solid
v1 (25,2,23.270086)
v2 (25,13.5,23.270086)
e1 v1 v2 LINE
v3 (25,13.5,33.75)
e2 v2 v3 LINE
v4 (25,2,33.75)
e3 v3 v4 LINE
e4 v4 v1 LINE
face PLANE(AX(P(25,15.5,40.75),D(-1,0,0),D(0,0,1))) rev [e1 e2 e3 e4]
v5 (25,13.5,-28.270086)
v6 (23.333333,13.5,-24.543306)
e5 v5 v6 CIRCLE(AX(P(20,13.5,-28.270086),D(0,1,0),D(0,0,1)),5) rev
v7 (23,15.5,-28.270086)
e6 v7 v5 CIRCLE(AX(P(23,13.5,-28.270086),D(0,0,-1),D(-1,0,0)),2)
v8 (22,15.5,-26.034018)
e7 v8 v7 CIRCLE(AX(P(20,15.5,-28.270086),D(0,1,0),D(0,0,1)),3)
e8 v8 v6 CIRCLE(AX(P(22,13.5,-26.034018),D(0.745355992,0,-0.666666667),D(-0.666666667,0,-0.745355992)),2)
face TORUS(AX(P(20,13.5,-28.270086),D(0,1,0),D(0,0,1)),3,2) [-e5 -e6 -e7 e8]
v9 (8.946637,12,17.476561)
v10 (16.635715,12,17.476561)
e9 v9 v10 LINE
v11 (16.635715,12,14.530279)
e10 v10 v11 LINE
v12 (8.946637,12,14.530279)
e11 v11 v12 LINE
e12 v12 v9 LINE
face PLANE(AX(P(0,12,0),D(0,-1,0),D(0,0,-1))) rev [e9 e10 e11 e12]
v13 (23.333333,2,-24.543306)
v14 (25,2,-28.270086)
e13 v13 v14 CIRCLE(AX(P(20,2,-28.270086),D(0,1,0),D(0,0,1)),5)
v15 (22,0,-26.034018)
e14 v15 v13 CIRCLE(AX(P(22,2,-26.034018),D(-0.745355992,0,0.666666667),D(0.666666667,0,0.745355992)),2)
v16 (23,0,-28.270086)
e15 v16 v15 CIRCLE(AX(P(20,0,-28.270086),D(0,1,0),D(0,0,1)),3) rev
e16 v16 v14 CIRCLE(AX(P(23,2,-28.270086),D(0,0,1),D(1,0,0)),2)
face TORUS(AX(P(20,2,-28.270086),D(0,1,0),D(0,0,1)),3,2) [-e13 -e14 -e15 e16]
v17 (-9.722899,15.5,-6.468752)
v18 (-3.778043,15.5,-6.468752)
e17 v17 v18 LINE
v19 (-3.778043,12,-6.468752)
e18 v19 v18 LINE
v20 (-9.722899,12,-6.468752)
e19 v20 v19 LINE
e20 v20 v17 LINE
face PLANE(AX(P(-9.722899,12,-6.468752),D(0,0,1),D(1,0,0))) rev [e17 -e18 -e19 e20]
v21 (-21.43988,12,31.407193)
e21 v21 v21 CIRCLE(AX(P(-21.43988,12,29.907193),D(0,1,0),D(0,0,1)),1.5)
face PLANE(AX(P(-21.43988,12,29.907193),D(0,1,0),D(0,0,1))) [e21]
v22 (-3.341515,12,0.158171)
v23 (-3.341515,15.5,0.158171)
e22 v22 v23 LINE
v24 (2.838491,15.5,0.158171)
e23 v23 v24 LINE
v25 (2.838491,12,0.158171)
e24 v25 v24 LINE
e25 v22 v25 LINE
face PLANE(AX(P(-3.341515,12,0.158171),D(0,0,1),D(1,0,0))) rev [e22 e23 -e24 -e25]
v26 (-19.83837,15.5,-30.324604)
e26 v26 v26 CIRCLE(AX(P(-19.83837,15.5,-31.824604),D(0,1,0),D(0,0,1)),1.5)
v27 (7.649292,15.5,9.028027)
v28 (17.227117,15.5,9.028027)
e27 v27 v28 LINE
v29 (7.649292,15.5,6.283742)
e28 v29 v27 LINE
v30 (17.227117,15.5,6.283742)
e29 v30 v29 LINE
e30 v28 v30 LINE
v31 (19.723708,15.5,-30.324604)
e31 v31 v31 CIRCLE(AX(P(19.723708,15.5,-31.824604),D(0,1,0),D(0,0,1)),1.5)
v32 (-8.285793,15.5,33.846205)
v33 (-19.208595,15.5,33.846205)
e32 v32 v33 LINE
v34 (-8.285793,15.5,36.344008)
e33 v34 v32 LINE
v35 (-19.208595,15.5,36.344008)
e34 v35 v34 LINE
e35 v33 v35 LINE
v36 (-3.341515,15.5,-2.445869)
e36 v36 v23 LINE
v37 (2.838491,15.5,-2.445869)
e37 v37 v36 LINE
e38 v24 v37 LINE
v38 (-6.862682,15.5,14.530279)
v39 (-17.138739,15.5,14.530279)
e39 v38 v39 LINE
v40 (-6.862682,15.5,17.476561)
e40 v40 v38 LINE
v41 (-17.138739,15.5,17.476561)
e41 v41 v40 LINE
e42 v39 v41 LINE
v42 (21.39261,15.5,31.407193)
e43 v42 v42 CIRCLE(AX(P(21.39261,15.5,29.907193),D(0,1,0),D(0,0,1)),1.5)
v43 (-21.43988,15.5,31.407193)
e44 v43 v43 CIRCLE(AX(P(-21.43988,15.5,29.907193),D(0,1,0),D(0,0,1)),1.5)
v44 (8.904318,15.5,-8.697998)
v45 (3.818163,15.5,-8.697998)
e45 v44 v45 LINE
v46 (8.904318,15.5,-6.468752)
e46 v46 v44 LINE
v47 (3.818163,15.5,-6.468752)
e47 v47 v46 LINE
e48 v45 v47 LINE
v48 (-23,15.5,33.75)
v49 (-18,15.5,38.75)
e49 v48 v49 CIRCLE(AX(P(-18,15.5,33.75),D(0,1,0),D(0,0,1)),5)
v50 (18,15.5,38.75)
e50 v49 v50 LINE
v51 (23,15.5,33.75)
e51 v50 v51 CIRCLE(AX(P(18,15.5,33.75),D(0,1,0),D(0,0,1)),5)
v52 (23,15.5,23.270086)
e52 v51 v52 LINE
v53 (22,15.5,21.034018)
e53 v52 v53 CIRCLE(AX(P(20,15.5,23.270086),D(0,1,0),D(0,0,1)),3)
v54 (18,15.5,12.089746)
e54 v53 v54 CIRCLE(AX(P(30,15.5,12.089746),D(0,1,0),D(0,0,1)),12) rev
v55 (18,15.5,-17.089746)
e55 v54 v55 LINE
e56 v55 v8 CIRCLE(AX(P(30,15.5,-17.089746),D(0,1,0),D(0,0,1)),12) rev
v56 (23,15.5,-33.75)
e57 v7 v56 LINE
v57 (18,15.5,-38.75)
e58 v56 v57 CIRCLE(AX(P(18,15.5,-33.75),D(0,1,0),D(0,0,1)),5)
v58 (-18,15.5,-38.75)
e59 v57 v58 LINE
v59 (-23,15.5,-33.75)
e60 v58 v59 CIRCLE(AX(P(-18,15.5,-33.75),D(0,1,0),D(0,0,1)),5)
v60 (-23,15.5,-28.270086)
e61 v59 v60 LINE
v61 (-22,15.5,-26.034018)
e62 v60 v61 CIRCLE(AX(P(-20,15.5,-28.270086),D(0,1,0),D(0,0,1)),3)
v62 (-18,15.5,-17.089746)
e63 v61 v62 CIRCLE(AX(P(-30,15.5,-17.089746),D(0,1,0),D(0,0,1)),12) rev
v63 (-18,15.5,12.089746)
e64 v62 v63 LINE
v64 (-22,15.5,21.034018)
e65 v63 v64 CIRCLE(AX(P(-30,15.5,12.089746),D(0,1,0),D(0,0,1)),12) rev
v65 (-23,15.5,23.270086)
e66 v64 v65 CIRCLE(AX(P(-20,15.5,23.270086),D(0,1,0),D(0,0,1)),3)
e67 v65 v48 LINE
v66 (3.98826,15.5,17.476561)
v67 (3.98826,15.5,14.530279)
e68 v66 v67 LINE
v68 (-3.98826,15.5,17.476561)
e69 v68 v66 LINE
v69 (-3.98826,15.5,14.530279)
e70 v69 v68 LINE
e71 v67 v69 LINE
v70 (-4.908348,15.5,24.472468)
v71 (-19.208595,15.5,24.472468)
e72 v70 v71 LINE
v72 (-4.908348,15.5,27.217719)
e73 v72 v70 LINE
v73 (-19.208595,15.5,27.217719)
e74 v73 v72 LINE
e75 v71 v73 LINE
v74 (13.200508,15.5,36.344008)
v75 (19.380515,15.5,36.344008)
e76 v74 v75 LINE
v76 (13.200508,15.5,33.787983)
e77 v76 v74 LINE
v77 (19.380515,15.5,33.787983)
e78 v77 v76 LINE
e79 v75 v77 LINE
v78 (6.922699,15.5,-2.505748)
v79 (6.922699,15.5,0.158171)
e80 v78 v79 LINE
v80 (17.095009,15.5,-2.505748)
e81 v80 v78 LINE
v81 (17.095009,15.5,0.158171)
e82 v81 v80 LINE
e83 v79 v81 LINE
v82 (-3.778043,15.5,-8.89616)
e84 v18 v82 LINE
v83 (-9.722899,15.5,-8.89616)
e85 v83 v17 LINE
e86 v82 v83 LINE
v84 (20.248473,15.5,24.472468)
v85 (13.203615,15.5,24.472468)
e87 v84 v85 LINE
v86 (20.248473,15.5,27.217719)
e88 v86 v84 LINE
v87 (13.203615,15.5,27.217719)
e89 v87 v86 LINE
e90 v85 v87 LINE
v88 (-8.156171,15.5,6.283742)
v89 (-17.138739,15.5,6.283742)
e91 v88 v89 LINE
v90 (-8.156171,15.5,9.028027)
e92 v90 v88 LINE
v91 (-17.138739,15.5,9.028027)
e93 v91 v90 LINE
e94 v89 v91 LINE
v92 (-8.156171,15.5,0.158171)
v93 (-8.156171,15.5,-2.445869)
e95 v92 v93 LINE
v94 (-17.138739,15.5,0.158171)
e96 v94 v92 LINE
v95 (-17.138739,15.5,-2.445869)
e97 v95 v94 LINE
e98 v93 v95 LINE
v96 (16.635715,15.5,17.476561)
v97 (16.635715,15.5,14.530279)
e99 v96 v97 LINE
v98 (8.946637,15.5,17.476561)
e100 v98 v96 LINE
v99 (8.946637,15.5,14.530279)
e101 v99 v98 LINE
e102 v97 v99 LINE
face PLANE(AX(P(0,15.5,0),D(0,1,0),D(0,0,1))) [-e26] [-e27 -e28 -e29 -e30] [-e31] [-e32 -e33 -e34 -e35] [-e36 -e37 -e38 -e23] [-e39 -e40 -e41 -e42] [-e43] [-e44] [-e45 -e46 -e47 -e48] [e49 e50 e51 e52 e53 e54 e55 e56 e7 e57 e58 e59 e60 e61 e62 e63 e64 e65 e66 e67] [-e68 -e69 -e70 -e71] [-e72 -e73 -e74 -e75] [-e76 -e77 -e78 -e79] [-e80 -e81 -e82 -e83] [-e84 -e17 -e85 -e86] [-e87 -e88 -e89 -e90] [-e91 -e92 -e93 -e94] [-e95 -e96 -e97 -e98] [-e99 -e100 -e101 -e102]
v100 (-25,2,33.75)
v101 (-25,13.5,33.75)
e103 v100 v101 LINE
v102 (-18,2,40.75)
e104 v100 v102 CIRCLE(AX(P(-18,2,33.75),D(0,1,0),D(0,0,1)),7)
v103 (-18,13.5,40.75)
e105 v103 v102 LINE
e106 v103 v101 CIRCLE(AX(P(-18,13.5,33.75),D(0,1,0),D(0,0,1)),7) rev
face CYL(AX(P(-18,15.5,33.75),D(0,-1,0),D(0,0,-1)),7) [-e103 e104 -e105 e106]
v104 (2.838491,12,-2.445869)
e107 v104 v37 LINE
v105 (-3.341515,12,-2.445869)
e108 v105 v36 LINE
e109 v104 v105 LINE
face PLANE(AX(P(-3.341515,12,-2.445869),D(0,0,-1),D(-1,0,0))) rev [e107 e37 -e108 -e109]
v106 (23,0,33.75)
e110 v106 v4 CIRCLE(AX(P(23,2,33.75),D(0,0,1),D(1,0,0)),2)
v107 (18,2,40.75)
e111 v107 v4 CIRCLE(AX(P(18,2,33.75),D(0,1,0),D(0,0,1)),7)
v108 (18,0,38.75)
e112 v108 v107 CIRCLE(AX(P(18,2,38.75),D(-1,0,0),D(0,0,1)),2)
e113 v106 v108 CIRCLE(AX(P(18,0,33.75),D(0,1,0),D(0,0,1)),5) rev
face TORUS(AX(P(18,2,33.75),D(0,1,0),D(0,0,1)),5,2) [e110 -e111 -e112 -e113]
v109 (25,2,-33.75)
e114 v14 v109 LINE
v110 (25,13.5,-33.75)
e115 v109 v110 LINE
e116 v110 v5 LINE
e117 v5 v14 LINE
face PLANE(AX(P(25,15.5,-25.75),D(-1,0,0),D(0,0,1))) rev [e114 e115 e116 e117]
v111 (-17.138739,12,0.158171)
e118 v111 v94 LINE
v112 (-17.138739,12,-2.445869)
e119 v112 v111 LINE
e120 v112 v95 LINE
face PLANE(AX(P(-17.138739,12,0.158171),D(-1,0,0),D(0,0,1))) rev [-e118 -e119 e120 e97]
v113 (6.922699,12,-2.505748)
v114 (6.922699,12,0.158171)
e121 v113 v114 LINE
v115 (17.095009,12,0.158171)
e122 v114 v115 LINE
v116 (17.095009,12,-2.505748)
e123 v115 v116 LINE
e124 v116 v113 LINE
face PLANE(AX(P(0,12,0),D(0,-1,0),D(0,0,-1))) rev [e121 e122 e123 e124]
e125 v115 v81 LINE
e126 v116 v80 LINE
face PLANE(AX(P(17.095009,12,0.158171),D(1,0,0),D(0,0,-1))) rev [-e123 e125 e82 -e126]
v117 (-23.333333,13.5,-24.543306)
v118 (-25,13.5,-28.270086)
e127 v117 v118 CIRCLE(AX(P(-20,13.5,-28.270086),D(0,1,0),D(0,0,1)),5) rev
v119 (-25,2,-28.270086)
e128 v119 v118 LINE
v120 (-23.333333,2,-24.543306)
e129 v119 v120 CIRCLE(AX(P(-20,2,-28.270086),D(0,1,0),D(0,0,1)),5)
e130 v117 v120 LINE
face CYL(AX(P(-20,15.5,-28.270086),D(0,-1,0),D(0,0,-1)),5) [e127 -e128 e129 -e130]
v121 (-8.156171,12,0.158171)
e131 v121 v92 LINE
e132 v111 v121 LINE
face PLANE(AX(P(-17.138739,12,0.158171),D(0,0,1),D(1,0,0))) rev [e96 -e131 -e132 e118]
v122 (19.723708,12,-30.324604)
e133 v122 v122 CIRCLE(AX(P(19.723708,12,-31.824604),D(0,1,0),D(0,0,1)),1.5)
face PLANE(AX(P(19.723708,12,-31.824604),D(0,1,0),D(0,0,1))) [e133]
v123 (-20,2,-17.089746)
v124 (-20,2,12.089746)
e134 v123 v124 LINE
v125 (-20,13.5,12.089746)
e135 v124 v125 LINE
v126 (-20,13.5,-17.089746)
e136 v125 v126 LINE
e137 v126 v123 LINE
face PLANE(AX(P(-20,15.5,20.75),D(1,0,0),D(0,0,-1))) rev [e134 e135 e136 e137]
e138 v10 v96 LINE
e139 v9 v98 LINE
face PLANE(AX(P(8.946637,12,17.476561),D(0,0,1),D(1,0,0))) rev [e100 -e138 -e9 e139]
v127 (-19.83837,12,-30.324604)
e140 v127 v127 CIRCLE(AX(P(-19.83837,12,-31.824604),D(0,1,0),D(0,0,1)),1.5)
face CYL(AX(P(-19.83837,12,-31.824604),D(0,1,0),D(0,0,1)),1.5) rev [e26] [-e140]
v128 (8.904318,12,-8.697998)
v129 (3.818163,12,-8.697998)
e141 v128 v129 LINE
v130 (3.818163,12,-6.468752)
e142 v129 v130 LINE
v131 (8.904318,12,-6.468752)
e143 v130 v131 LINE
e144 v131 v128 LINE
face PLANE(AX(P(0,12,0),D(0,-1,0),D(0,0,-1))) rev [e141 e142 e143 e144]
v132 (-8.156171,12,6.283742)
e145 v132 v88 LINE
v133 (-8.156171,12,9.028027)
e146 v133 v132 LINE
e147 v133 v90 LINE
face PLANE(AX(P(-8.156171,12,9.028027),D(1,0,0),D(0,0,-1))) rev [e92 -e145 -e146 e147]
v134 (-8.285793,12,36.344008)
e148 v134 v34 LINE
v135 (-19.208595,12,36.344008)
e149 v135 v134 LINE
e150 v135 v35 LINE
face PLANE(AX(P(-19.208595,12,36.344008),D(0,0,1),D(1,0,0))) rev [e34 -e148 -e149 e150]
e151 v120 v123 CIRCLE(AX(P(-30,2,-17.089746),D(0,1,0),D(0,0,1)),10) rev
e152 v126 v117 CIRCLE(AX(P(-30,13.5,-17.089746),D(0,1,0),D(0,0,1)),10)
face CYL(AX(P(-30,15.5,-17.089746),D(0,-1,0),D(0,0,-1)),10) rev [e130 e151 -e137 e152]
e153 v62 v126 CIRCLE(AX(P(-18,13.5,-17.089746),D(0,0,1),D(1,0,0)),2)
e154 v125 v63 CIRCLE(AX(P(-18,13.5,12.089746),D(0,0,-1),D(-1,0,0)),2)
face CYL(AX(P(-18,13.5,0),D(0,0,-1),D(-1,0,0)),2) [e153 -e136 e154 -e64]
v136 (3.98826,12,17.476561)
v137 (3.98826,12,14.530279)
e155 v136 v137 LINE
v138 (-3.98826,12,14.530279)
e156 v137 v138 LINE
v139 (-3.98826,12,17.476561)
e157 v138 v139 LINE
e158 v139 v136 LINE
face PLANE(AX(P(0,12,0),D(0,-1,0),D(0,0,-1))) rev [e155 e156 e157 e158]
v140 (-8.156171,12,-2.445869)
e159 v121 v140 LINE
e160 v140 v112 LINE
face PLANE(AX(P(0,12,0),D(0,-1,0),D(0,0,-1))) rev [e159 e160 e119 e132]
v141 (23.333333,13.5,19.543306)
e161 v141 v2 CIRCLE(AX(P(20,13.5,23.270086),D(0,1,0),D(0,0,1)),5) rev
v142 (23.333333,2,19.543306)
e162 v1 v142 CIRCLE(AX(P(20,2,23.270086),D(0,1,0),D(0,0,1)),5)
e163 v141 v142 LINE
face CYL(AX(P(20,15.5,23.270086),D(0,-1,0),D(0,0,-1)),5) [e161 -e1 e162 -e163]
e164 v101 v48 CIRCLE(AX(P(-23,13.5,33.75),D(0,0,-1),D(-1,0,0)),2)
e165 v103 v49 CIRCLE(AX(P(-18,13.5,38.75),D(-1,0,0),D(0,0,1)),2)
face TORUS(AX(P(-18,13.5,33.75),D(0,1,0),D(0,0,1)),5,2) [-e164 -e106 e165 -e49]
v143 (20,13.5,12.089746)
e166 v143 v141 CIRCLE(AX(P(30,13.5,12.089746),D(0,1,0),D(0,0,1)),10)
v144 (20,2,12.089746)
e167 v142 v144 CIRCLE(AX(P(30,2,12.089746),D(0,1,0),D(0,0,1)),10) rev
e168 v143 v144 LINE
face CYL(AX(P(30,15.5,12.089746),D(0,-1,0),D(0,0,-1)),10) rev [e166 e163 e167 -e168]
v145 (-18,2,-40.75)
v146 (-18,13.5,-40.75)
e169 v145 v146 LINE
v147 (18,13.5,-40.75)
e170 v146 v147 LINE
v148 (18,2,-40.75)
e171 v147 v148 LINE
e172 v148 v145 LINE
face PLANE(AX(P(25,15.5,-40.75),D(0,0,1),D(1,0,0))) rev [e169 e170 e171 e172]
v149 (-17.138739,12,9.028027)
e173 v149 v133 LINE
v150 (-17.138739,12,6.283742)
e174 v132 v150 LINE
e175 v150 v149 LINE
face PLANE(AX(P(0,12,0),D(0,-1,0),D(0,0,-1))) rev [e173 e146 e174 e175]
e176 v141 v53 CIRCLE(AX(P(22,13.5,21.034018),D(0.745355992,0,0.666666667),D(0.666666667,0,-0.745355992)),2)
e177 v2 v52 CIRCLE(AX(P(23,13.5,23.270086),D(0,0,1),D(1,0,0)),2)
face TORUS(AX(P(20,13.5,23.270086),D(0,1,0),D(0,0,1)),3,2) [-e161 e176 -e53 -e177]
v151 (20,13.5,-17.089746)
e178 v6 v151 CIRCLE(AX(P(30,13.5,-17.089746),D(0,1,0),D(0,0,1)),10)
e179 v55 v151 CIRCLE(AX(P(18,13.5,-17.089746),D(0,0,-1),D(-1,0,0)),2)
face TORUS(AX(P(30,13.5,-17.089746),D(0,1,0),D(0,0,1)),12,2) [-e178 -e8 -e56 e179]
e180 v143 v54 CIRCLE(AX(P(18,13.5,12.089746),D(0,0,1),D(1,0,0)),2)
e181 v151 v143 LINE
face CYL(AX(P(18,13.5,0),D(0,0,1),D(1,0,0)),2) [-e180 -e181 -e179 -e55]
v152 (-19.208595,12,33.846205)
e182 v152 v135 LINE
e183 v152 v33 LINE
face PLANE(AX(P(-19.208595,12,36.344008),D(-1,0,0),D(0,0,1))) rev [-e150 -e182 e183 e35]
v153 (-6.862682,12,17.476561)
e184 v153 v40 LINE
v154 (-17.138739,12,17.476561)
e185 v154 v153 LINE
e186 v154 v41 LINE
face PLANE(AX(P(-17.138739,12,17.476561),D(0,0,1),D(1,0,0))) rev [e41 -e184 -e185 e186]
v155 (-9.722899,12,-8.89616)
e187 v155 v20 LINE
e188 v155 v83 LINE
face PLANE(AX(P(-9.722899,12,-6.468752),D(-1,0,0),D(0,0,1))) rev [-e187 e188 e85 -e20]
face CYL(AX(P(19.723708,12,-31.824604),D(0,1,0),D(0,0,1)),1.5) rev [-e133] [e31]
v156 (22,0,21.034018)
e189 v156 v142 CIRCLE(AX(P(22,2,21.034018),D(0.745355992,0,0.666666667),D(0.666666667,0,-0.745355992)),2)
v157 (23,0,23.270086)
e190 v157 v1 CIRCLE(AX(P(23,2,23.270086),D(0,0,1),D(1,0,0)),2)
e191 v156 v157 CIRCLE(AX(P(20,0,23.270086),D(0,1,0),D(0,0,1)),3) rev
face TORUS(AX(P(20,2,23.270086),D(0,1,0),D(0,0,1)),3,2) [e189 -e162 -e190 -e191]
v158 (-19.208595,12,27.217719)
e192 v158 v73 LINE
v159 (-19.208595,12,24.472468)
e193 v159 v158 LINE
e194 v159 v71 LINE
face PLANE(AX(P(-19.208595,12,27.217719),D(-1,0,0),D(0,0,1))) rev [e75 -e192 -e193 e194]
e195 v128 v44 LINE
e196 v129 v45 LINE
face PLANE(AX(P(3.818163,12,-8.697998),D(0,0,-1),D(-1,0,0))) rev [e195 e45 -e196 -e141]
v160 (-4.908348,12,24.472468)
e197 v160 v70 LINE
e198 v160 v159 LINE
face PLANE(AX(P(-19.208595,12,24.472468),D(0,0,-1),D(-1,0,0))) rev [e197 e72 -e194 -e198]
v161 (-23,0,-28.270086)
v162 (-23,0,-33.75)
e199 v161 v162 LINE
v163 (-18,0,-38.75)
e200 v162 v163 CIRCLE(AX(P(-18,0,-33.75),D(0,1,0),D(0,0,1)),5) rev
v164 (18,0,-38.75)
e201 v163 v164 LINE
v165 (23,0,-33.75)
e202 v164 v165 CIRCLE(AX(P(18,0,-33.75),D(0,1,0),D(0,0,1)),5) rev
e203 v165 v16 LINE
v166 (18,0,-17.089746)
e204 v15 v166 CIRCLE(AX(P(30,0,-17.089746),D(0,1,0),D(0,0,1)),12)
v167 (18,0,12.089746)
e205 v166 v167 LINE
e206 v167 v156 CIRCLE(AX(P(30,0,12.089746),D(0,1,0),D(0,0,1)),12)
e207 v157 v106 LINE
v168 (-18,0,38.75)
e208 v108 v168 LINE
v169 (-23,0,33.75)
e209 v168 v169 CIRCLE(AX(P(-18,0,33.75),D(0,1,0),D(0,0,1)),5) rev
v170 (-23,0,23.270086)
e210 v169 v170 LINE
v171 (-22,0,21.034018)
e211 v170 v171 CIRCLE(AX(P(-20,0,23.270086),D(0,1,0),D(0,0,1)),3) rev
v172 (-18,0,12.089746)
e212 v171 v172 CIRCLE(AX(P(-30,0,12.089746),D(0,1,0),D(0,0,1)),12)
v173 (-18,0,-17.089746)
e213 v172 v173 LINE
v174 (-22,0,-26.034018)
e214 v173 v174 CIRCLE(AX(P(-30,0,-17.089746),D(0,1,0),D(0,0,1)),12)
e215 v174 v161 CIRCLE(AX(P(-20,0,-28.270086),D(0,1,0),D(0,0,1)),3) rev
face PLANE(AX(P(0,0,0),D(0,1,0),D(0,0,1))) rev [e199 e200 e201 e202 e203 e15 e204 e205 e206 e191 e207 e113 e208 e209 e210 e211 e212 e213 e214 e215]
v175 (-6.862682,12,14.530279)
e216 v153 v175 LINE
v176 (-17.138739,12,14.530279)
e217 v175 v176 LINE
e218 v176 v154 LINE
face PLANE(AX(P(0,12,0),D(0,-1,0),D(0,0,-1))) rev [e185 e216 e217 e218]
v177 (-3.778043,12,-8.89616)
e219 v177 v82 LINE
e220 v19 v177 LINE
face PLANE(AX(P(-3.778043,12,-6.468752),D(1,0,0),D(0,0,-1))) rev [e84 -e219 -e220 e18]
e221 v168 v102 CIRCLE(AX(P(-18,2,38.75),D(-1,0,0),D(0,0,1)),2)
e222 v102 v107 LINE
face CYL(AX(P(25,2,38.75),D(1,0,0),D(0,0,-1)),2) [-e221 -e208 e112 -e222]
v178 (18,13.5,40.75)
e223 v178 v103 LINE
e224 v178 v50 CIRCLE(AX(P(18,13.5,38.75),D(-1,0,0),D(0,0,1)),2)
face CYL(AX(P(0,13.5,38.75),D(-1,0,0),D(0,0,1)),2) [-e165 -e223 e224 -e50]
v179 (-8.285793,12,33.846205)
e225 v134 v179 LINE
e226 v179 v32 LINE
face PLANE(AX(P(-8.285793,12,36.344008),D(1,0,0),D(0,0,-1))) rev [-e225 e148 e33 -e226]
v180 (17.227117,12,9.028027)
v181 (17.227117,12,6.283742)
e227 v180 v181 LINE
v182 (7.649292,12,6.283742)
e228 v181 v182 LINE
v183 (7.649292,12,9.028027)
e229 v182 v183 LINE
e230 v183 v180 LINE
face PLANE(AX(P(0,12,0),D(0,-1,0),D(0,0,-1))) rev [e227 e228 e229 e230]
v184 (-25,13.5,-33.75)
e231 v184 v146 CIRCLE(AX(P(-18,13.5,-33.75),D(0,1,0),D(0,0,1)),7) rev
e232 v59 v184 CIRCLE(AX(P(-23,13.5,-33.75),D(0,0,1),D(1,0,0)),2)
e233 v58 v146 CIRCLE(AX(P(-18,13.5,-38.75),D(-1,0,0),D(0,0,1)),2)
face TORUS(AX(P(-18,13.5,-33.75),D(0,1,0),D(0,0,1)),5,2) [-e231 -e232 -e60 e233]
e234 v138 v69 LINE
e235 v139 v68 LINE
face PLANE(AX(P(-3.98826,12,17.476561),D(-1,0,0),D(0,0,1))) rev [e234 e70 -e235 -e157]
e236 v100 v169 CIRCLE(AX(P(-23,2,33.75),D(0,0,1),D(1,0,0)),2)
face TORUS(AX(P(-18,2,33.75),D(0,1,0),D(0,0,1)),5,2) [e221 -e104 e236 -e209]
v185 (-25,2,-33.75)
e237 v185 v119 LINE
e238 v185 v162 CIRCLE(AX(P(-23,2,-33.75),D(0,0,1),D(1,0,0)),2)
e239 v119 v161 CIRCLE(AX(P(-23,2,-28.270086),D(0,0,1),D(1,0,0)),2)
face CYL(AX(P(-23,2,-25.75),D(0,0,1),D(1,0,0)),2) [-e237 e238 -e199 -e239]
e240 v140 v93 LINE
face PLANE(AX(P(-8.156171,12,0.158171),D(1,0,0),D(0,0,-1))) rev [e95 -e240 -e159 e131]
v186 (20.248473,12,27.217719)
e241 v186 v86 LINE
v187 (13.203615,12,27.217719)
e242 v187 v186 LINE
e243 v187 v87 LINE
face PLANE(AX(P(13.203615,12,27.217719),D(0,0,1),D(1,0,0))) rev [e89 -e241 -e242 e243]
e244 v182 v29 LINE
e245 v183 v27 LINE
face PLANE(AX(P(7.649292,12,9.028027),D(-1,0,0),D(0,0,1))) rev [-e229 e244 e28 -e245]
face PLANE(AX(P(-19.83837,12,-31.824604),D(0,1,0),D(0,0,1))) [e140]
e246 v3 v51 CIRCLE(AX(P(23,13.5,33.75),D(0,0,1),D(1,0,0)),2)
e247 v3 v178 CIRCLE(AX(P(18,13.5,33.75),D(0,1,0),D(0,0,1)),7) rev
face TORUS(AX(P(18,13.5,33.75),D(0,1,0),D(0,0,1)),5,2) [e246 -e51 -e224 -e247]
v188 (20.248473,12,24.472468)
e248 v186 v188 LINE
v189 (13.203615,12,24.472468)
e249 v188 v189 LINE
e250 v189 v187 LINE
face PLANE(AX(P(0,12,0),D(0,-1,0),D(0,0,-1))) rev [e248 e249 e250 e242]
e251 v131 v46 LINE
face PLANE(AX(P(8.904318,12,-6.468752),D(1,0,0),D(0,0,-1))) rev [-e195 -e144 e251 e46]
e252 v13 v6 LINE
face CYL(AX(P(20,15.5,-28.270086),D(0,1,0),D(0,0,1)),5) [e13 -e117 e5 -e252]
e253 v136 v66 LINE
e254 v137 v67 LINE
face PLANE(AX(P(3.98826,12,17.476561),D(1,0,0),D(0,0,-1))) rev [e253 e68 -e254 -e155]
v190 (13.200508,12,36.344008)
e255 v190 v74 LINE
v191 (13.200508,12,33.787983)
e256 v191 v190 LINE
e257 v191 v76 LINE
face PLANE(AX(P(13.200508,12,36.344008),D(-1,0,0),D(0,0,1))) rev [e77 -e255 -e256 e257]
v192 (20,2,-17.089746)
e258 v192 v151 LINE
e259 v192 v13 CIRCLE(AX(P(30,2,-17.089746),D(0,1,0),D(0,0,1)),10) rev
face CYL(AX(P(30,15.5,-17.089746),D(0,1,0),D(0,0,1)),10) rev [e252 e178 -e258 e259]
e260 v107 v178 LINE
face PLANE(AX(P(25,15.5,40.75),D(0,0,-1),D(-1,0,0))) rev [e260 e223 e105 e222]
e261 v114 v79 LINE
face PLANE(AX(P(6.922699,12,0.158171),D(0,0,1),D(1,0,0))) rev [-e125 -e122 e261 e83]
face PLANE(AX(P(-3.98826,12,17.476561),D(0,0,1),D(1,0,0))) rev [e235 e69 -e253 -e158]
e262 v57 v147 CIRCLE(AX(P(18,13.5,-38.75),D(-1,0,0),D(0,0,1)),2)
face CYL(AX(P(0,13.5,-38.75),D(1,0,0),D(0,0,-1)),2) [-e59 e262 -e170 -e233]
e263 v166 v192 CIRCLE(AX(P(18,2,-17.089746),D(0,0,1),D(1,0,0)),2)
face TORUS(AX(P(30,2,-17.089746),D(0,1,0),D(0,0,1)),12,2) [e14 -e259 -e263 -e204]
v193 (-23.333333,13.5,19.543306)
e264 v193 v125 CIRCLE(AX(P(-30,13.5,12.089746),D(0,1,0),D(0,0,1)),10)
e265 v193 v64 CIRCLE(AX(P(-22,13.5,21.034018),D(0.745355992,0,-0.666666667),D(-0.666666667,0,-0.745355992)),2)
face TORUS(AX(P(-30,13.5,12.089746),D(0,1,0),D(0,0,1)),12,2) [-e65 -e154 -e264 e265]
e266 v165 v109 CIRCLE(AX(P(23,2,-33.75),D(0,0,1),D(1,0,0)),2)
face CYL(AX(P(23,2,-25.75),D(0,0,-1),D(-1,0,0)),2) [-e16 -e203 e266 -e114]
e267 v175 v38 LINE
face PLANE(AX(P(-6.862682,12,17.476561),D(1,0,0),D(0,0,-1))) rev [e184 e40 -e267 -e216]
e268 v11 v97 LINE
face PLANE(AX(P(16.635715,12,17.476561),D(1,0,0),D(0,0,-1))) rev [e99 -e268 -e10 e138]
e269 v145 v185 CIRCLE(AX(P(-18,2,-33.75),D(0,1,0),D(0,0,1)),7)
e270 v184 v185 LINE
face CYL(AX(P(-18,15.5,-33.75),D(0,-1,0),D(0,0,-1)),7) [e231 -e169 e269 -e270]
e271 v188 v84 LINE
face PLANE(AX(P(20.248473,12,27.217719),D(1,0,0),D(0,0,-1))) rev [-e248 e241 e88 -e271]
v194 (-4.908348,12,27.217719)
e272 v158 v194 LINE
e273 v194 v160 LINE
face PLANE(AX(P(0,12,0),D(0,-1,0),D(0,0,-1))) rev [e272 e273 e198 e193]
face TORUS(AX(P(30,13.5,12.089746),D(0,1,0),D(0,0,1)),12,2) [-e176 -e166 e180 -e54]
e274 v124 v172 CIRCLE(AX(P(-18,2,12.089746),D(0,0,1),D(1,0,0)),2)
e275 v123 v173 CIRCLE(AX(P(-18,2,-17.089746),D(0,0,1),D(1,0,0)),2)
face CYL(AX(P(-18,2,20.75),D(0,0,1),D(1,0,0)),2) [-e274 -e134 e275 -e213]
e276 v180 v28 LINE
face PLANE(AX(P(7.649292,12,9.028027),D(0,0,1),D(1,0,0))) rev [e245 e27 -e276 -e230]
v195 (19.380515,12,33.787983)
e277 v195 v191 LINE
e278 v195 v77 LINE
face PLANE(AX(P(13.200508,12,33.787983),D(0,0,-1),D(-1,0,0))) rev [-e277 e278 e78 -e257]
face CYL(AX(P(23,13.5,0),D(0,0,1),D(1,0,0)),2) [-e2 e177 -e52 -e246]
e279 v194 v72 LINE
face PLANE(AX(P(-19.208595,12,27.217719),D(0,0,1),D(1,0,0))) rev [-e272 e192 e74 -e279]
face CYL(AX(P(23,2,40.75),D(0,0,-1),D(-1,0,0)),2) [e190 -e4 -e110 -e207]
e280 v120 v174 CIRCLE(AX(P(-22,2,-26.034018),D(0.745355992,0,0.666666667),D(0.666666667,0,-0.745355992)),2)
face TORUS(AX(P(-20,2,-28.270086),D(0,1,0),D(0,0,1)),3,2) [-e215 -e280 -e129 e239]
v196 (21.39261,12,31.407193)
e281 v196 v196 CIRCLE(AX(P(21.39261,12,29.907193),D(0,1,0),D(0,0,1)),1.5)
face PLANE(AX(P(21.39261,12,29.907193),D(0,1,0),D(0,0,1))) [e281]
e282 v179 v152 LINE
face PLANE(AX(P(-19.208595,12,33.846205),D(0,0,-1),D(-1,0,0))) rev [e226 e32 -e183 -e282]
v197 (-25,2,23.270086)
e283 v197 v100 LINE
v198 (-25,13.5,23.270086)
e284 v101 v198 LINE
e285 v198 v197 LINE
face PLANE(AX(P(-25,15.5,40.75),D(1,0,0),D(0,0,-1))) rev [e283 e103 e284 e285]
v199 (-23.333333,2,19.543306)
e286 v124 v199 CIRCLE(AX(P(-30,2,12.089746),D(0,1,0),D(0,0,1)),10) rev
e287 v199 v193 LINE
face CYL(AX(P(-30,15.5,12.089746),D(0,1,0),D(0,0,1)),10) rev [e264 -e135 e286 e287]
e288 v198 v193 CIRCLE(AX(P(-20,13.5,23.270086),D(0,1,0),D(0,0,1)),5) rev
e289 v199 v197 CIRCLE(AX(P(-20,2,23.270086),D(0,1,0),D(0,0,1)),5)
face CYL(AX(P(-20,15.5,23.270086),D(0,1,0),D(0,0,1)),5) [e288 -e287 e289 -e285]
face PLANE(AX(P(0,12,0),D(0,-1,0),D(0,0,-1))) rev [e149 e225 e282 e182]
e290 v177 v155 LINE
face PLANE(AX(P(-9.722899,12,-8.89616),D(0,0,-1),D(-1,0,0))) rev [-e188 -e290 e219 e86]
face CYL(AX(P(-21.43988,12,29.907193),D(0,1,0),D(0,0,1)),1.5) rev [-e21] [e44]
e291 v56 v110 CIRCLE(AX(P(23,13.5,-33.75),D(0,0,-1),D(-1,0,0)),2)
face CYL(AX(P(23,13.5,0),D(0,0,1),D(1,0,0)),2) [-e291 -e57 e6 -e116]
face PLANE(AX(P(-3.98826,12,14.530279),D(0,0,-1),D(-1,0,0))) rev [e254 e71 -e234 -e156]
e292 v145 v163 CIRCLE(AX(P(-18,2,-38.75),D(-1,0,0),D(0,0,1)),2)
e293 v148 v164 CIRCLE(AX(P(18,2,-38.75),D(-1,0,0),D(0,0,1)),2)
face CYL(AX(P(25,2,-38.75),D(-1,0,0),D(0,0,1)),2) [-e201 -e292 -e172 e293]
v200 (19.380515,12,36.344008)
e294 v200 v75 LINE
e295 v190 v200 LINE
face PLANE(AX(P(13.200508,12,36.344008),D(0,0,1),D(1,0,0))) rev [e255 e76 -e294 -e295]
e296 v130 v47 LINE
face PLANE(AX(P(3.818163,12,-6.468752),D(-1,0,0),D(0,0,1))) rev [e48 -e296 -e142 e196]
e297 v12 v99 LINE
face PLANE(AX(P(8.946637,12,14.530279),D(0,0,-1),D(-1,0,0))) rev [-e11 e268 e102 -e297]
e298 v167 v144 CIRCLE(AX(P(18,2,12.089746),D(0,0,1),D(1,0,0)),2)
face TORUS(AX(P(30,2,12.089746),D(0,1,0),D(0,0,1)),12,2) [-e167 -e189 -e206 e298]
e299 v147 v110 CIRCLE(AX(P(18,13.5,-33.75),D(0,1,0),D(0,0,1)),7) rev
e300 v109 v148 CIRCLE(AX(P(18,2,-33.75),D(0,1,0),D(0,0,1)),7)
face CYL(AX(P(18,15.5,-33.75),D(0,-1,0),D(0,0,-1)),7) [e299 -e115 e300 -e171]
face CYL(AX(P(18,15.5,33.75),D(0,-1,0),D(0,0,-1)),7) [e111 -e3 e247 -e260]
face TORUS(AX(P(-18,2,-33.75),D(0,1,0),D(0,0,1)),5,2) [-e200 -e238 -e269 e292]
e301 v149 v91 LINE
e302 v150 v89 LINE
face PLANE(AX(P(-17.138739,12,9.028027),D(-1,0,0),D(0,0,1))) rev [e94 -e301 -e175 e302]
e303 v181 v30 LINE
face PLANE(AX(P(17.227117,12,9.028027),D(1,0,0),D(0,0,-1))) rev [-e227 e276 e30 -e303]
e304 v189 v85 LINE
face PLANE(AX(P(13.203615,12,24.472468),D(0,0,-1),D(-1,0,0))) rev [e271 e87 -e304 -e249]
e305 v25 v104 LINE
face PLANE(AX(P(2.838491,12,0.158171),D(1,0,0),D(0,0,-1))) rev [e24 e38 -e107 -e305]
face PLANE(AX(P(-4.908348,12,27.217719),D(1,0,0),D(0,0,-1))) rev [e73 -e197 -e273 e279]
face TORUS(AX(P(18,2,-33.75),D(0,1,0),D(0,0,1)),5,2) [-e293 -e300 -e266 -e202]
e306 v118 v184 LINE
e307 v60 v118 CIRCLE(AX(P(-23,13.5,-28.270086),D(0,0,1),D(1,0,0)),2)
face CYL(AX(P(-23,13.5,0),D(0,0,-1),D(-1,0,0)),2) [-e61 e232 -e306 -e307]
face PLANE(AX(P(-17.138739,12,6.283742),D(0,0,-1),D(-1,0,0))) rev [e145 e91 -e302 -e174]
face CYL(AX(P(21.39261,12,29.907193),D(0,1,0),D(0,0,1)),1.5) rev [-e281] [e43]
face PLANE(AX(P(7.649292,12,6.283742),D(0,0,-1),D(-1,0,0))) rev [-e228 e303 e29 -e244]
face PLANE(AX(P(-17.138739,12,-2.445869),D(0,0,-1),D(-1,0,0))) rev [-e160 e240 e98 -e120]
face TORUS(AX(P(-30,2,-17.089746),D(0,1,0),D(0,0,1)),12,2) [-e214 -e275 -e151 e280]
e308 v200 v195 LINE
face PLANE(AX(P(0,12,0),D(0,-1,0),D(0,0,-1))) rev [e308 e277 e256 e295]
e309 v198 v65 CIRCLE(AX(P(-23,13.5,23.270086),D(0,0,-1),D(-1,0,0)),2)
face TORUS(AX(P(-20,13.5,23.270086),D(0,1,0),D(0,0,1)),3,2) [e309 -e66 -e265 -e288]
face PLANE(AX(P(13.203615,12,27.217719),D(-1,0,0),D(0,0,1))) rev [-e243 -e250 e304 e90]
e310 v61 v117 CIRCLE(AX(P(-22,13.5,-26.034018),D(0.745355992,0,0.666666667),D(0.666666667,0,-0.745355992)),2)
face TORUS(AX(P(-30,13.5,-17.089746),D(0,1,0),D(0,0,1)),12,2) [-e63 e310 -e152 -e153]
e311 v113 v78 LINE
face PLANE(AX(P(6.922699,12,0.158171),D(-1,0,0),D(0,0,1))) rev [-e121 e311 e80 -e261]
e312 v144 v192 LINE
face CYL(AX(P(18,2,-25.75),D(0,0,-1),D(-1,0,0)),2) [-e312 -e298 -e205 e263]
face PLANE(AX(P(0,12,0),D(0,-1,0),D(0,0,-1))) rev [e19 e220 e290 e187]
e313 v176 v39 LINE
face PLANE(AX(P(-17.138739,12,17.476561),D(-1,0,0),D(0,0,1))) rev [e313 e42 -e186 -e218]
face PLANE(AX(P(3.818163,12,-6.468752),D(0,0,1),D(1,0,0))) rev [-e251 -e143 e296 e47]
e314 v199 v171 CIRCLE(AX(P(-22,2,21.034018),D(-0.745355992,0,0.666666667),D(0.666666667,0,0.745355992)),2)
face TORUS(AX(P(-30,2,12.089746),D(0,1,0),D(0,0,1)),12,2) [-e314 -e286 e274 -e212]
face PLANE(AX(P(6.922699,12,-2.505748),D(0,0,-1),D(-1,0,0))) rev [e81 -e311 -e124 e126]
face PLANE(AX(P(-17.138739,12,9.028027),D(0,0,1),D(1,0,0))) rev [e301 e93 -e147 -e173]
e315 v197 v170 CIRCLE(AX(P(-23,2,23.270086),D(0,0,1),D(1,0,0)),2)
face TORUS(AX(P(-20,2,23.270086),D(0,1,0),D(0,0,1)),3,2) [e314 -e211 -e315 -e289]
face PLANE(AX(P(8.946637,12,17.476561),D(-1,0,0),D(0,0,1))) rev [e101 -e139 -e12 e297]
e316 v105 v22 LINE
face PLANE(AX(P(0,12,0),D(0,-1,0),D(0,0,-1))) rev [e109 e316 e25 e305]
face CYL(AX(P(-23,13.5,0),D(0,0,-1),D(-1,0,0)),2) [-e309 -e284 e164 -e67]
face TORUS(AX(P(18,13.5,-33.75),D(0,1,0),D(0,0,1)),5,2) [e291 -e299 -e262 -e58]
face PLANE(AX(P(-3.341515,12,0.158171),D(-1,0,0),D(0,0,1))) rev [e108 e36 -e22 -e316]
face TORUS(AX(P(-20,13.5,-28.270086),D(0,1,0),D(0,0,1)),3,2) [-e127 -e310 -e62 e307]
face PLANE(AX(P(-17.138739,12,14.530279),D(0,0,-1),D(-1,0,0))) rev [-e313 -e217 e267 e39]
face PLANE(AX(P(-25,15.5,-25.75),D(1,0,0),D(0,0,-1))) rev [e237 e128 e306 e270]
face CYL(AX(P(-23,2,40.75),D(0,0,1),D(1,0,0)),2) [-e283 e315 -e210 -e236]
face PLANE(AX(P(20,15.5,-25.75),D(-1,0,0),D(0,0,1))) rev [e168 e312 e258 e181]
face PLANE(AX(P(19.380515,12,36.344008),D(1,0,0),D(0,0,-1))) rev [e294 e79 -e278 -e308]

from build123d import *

# Parameters (mm, degrees)
BOSS_EXTRUDE1_DEPTH = 15.5
FILLET1_R           = 7
FILLET2_R           = 10
FILLET3_R           = 5
FILLET4_R           = 2
SKETCH2_R           = 1.5
SKETCH2_W           = 10.92280205
SKETCH2_H           = 2.497802755
SKETCH2_W_2         = 14.300247421
SKETCH2_H_2         = 2.745251167
SKETCH2_W_3         = 6.180006424
SKETCH2_H_3         = 2.556024723
SKETCH2_W_4         = 7.044858218
SKETCH2_W_5         = 10.276057193
SKETCH2_H_4         = 2.946282132
SKETCH2_W_6         = 7.976519918
SKETCH2_W_7         = 7.689077759
SKETCH2_W_8         = 8.982567476
SKETCH2_H_5         = 2.60403982
SKETCH2_W_9         = 6.180006423
SKETCH2_W_10        = 10.172310113
SKETCH2_H_6         = 2.663918404
SKETCH2_W_11        = 5.94485656
SKETCH2_H_7         = 2.427407937
SKETCH2_W_12        = 5.086155057
SKETCH2_H_8         = 2.229246052
SKETCH2_H_9         = 2.744285017
SKETCH2_W_13        = 9.577824458
CUT_EXTRUDE1_DEPTH  = 3.5


with BuildPart() as part:
    # Sketch1 → Boss-Extrude1 (new body)
    with BuildSketch(Plane(origin=(0, 0, 0), x_dir=(1, 0, 0), z_dir=(0, 1, 0))):
        Polygon((25, -40.75), (-25, -40.75), (-25, -20.75), (-20, -20.75), (-20, 25.75), (-25, 25.75), (-25, 40.75), (25, 40.75), (25, 25.75), (20, 25.75), (20, -20.75), (25, -20.75), align=None)
    extrude(amount=BOSS_EXTRUDE1_DEPTH)

    # Fillet1
    fillet1_edges = [part.edges().sort_by_distance(p)[0] for p in [
        (-25, 7.75, -40.75),
        (25, 7.75, -40.75),
        (25, 7.75, 40.75),
        (-25, 7.75, 40.75),
    ]]
    fillet(fillet1_edges, radius=FILLET1_R)

    # Fillet2
    # the kernel refuses this fillet: 10 mm, written as the material it adds along each edge
    with BuildSketch(Plane(origin=(-20, 0, 20.75), x_dir=(-1, 0, 0), z_dir=(0, 1, 0))) as fillet2_piece_1:
        with BuildLine():
            CenterArc((10, -8.660254038), FILLET2_R, 120, 60)
            Line((0, -8.660254038), (-0.2, -8.660254038))
            Line((-0.2, -8.660254038), (-0.2, 0))
            Line((-0.2, 0), (0, 0.2))
            ThreePointArc((0, 0.2), (2.5, 0.2), (4.9, 0.173205081))
            Line((4.9, 0.173205081), (5, 0))
        make_face()
    extrude(amount=15.5)
    with BuildSketch(Plane(origin=(-20, 0, -25.75), x_dir=(0, 0, 1), z_dir=(0, 1, 0))) as fillet2_piece_2:
        with BuildLine():
            CenterArc((8.660254038, -10), FILLET2_R, 90, 60)
            Line((0, -5), (-0.173205081, -4.9))
            ThreePointArc((-0.173205081, -4.9), (-0.2, -2.5), (-0.2, 0))
            Line((-0.2, 0), (0, 0.2))
            Line((0, 0.2), (8.660254038, 0.2))
            Line((8.660254038, 0.2), (8.660254038, 0))
        make_face()
    extrude(amount=15.5)
    with BuildSketch(Plane(origin=(20, 0, 20.75), x_dir=(1, 0, 0), z_dir=(0, 1, 0))) as fillet2_piece_3:
        with BuildLine():
            CenterArc((10, 8.660254038), FILLET2_R, 180, 60)
            Line((0, 8.660254038), (-0.2, 8.660254038))
            Line((-0.2, 8.660254038), (-0.2, 0))
            Line((-0.2, 0), (0, -0.2))
            ThreePointArc((0, -0.2), (2.5, -0.2), (4.9, -0.173205081))
            Line((4.9, -0.173205081), (5, 0))
        make_face()
    extrude(amount=15.5)
    with BuildSketch(Plane(origin=(20, 0, -25.75), x_dir=(0, 0, 1), z_dir=(0, 1, 0))) as fillet2_piece_4:
        with BuildLine():
            CenterArc((8.660254038, 10), FILLET2_R, 210, 60)
            Line((0, 5), (-0.173205081, 4.9))
            ThreePointArc((-0.173205081, 4.9), (-0.2, 2.5), (-0.2, 0))
            Line((-0.2, 0), (0, -0.2))
            Line((0, -0.2), (8.660254038, -0.2))
            Line((8.660254038, -0.2), (8.660254038, 0))
        make_face()
    extrude(amount=15.5)

    # Fillet3
    fillet3_edges = [part.edges().sort_by_distance(p)[0] for p in [
        (25, 7.75, -25.75),
        (25, 7.75, 20.75),
        (-25, 7.75, 20.75),
        (-25, 7.75, -25.75),
    ]]
    fillet(fillet3_edges, radius=FILLET3_R)

    # Fillet4
    fillet4_edges = [part.edges().sort_by_distance(p)[0] for p in [
        (0, 0, -40.75),
        (0, 15.5, -40.75),
        (-25, 0, -31.010042925),
        (25, 0, 28.510042925),
        (0, 0, 40.75),
        (22.949747468, 0, 38.699747468),
        (-22.949747468, 0, 38.699747468),
        (-22.949747468, 0, -38.699747468),
        (22.949747468, 0, -38.699747468),
        (-25, 15.5, -31.010042925),
        (0, 15.5, 40.75),
        (25, 15.5, 28.510042925),
        (22.949747468, 15.5, 38.699747468),
        (-22.949747468, 15.5, 38.699747468),
        (-22.949747468, 15.5, -38.699747468),
        (22.949747468, 15.5, -38.699747468),
        (-20, 0, -2.5),
        (-20, 15.5, -2.5),
        (20, 0, -2.5),
        (20, 15.5, -2.5),
        (-20.871290708, 15.5, 16.172228867),
        (-20.871290708, 0, -21.172228867),
        (20.871290708, 0, 16.172228867),
        (20.871290708, 15.5, -21.172228867),
        (-25, 0, 28.510042925),
        (-25, 15.5, 28.510042925),
        (25, 0, -31.010042925),
        (20.871290708, 0, -21.172228867),
        (-20.871290708, 0, 16.172228867),
        (-24.564354646, 0, -26.228844397),
        (24.564354646, 0, -26.228844397),
        (24.564354646, 0, 21.228844397),
        (-24.564354646, 0, 21.228844397),
        (25, 15.5, -31.010042925),
        (-20.871290708, 15.5, -21.172228867),
        (20.871290708, 15.5, 16.172228867),
        (-24.564354646, 15.5, -26.228844397),
        (24.564354646, 15.5, -26.228844397),
        (24.564354646, 15.5, 21.228844397),
        (-24.564354646, 15.5, 21.228844397),
    ]]
    fillet(fillet4_edges, radius=FILLET4_R)

    # Sketch2 → Cut-Extrude1 (cut)
    with BuildSketch(Plane(origin=(0, 15.5, 0), x_dir=(1, 0, 0), z_dir=(0, 1, 0))):
        with Locations(Location((-21.439879839, -29.907193015, 0), (0, 0, 270))):
            Circle(SKETCH2_R)
        with Locations(Location((21.392609924, -29.907193015, 0), (0, 0, 270))):
            Circle(SKETCH2_R)
        with Locations(Location((-19.83836984, 31.824604268, 0), (0, 0, 270))):
            Circle(SKETCH2_R)
        with Locations(Location((19.72370758, 31.824604268, 0), (0, 0, 270))):
            Circle(SKETCH2_R)
        with Locations((-13.747194041, -35.095106184)):
            Rectangle(SKETCH2_W, SKETCH2_H)
        with Locations((-12.058471356, -25.845093422)):
            Rectangle(SKETCH2_W_2, SKETCH2_H_2)
        with Locations((16.290511598, -35.0659952)):
            Rectangle(SKETCH2_W_3, SKETCH2_H_3)
        with Locations((16.72604395, -25.845093422)):
            Rectangle(SKETCH2_W_4, SKETCH2_H_2)
        with Locations((-12.000710148, -16.003419816)):
            Rectangle(SKETCH2_W_5, SKETCH2_H_4)
        with Locations((0, -16.003419816)):
            Rectangle(SKETCH2_W_6, SKETCH2_H_4)
        with Locations((12.791176086, -16.003419816)):
            Rectangle(SKETCH2_W_7, SKETCH2_H_4)
        with Locations((-12.647455006, 1.143849121)):
            Rectangle(SKETCH2_W_8, SKETCH2_H_5)
        with Locations((-0.251511889, 1.143849121)):
            Rectangle(SKETCH2_W_9, SKETCH2_H_5)
        with Locations((12.008853949, 1.173788413)):
            Rectangle(SKETCH2_W_10, SKETCH2_H_6)
        with Locations((-6.750471196, 7.68245568)):
            Rectangle(SKETCH2_W_11, SKETCH2_H_7)
        with Locations((6.361240217, 7.583374737)):
            Rectangle(SKETCH2_W_12, SKETCH2_H_8)
        with Locations((-12.647455006, -7.655884762)):
            Rectangle(SKETCH2_W_8, SKETCH2_H_9)
        with Locations((12.4382047, -7.655884762)):
            Rectangle(SKETCH2_W_13, SKETCH2_H_9)
    extrude(amount=-CUT_EXTRUDE1_DEPTH, mode=Mode.SUBTRACT)


solid = part.part
